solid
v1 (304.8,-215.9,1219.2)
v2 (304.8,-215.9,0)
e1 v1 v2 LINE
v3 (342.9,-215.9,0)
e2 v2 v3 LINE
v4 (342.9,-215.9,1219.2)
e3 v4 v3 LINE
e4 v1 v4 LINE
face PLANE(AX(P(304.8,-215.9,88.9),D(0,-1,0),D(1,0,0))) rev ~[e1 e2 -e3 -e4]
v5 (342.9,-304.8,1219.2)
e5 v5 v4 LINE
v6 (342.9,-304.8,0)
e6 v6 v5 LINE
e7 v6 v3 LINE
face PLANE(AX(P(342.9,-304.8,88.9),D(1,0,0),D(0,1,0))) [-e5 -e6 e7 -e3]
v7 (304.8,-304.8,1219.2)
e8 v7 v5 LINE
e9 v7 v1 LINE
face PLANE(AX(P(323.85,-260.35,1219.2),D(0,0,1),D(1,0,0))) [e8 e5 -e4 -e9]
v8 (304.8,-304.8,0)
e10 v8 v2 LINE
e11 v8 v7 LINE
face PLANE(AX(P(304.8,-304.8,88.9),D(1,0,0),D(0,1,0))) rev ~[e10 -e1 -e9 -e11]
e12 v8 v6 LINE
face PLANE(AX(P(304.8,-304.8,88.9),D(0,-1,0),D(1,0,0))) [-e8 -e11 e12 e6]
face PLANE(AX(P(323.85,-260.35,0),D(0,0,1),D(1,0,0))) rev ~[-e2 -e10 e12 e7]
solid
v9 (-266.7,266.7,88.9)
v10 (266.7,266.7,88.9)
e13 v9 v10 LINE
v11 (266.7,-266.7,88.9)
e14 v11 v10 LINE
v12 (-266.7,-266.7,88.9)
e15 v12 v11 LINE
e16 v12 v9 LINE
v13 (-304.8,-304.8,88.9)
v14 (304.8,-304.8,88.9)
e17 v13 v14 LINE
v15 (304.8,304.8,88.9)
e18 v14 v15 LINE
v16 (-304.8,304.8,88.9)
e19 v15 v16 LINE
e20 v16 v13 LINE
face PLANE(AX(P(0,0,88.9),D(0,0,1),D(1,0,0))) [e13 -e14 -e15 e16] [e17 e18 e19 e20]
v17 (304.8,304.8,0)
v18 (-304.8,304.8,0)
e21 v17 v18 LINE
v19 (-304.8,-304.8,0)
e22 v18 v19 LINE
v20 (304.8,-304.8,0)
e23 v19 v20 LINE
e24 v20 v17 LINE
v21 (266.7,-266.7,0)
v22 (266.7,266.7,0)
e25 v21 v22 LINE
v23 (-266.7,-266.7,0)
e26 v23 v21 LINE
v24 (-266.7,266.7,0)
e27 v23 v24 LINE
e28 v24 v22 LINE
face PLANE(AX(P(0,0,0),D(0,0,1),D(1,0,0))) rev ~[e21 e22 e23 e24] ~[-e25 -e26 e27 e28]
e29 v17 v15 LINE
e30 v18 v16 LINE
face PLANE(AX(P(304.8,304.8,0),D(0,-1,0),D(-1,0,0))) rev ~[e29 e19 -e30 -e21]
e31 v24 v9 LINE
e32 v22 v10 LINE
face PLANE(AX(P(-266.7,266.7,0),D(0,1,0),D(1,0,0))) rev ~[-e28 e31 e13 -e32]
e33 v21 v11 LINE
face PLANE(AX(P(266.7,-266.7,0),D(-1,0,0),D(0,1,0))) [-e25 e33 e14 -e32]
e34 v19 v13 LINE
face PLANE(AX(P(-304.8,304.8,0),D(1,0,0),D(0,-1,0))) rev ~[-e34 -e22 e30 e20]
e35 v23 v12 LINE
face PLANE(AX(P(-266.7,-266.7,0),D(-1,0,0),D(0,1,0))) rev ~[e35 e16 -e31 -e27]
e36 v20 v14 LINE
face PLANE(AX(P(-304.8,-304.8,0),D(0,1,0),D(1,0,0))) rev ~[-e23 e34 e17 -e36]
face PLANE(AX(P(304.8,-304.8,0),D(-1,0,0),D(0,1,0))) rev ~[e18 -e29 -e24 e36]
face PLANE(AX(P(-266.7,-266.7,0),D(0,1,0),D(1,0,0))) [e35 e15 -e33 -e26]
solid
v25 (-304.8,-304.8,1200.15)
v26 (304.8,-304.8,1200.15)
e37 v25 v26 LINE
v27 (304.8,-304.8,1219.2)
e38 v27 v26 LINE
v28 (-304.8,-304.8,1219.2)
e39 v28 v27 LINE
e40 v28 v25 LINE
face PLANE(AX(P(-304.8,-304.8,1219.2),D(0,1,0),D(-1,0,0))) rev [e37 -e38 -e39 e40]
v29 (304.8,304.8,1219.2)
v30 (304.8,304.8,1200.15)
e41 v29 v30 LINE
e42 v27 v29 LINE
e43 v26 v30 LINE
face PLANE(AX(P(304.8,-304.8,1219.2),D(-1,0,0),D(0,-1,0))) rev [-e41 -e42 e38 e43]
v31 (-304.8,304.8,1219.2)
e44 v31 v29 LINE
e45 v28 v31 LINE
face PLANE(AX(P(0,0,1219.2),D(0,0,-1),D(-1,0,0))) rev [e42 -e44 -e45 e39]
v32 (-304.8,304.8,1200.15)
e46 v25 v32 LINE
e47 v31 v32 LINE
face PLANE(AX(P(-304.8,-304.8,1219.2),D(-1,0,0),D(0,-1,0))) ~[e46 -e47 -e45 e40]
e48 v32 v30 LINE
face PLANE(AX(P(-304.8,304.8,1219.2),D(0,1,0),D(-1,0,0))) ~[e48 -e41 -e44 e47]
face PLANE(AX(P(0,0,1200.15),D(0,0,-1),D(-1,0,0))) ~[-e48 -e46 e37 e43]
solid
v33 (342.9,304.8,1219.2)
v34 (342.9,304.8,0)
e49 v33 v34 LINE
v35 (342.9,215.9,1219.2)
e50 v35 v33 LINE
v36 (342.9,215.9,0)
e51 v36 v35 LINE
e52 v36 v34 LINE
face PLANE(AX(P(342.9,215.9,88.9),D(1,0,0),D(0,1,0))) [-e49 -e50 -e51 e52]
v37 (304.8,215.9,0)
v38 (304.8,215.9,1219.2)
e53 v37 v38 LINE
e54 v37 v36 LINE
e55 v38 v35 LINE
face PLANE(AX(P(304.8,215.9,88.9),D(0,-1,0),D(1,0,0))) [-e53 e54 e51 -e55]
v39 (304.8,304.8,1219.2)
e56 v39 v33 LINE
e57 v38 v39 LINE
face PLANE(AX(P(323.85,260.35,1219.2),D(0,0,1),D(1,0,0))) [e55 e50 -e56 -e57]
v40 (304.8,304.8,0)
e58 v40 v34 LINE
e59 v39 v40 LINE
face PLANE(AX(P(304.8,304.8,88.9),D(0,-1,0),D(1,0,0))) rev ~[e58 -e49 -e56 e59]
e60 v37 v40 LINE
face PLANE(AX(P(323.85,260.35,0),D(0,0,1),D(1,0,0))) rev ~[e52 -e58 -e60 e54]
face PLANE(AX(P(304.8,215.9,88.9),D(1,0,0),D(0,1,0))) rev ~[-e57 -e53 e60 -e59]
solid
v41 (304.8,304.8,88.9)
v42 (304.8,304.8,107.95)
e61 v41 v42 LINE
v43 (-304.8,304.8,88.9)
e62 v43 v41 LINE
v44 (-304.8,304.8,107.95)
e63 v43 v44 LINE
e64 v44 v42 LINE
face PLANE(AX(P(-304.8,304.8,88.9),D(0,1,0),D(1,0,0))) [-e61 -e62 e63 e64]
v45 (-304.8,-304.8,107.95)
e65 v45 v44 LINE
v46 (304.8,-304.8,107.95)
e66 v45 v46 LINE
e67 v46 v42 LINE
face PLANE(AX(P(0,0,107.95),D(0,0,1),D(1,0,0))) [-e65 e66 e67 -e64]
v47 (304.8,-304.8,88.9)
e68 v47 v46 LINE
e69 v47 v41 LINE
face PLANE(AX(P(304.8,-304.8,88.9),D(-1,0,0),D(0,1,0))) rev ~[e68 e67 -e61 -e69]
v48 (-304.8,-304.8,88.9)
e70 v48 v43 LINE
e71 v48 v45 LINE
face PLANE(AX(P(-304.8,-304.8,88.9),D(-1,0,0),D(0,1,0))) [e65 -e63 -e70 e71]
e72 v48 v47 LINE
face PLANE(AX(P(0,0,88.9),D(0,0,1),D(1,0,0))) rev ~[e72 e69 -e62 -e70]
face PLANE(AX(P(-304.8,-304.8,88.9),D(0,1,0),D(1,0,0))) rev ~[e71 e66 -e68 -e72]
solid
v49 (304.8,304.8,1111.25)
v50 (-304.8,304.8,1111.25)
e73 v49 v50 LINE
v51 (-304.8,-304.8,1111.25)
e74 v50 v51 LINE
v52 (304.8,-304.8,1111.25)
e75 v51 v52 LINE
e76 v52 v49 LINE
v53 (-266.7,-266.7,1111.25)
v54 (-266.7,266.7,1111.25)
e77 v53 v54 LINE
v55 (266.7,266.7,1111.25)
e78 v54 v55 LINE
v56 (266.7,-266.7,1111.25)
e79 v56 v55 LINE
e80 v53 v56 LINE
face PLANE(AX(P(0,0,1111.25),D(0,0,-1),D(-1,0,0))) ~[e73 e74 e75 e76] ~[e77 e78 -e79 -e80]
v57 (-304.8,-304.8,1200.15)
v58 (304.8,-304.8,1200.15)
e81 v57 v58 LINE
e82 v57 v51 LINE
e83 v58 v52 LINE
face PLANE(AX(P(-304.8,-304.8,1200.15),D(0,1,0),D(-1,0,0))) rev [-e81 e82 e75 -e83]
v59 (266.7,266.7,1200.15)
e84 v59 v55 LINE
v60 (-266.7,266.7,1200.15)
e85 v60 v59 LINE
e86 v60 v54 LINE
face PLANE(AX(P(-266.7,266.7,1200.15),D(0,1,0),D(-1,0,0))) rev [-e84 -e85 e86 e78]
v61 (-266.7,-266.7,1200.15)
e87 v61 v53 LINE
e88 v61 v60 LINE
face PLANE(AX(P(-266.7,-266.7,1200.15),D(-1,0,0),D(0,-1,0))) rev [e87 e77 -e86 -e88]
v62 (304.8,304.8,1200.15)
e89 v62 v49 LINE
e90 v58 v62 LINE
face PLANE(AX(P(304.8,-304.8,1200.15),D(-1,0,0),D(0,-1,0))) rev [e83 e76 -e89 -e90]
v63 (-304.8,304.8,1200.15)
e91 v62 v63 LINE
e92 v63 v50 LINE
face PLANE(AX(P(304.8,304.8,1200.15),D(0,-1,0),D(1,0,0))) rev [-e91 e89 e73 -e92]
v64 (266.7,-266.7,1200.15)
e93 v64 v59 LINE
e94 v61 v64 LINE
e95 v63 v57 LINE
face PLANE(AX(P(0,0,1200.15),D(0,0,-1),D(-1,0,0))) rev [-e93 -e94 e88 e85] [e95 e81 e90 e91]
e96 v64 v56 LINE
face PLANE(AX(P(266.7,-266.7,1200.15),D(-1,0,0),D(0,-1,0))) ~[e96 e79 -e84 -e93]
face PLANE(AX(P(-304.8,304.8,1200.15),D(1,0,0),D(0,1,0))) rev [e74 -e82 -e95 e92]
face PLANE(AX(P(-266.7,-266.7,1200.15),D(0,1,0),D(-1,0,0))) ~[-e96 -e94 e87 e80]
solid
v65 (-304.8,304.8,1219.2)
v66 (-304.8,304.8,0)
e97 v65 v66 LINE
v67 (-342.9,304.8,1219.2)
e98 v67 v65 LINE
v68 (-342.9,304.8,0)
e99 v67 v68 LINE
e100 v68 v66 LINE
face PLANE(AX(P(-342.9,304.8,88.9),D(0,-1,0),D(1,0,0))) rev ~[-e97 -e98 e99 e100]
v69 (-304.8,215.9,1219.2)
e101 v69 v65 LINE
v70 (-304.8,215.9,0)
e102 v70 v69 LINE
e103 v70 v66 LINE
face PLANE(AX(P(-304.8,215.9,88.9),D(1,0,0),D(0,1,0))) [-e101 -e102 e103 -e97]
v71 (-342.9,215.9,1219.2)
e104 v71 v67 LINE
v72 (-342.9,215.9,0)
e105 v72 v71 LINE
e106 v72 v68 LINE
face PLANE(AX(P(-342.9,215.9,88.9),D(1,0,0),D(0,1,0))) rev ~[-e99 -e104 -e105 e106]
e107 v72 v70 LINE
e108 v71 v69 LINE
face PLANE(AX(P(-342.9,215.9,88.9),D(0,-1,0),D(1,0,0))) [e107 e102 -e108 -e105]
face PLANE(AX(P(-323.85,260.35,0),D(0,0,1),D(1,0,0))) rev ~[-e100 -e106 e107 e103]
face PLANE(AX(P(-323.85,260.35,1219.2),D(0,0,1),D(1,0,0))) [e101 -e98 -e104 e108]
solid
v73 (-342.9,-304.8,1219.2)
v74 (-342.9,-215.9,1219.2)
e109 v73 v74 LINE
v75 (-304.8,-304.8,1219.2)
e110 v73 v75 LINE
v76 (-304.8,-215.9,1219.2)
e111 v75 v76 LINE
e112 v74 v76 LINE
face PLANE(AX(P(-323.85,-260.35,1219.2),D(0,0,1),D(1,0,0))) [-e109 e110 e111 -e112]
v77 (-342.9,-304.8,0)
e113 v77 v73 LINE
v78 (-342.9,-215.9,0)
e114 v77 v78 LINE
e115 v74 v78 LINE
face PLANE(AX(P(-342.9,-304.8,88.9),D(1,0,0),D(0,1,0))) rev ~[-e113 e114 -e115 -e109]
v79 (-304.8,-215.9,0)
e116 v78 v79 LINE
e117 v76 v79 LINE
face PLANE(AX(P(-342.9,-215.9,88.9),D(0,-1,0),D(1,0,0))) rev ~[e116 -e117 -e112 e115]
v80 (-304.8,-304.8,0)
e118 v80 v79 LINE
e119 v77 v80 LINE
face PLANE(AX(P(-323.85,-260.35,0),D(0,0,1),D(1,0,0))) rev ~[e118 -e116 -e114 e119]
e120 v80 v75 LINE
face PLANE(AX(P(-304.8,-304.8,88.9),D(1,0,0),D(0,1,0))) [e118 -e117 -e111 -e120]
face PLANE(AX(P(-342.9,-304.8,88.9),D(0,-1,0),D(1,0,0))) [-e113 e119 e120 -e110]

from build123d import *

# Parameters (mm, degrees)
F0_W          = 533.4
F0_H          = 533.4
F1_DEPTH      = 88.9
F2_W          = 38.1
F2_H          = 88.9
F3_DEPTH      = 1130.3
F3_DEPTH_BACK = 88.9
F4_W          = 609.6
F4_H          = 609.6
F5_DEPTH      = 19.05


# Not quite as in the source:
# - a feature of the source that left no trace in its solid (it failed there, or was rolled back) is left out
# - a pattern or mirror of a feature is missing from the dataset's text; its kind, count and spacing are read off the source's solid


with BuildPart() as f1:
    # F0 (on Top) → F1 (new body)
    with BuildSketch(Plane.XY):
        Polygon((-279.4, 304.8), (-304.8, 304.8), (-304.8, 215.9), (-304.8, -215.9), (-304.8, -304.8), (-279.4, -304.8), (304.8, -304.8), (304.8, -266.7), (304.8, -215.9), (304.8, 215.9), (304.8, 304.8), (-266.7, 304.8), align=None)
        Rectangle(F0_W, F0_H, mode=Mode.SUBTRACT)
    extrude(amount=F1_DEPTH)


with BuildPart() as f1_copies_1:
    # F1_copies: instance of F1
    add(f1.part.mirror(Plane.XY.offset(600.075)))


with BuildPart() as f3:
    # F2 (on face) → F3 (new body, two sides)
    with BuildSketch(Plane.XY.offset(88.9)) as f3_sk:
        with Locations((-323.85, 260.35)):
            Rectangle(F2_W, F2_H)
    extrude(amount=F3_DEPTH)
    extrude(f3_sk.sketch, amount=-F3_DEPTH_BACK)


with BuildPart() as f3b:
    # F2 (on face) → F3, piece 2 (new body, two sides)
    with BuildSketch(Plane.XY.offset(88.9)) as f3_2_sk:
        with Locations((323.85, 260.35)):
            Rectangle(F2_W, F2_H)
    extrude(amount=F3_DEPTH)
    extrude(f3_2_sk.sketch, amount=-F3_DEPTH_BACK)


with BuildPart() as f3c:
    # F2 (on face) → F3, piece 3 (new body, two sides)
    with BuildSketch(Plane.XY.offset(88.9)) as f3_3_sk:
        with Locations((323.85, -260.35)):
            Rectangle(F2_W, F2_H)
    extrude(amount=F3_DEPTH)
    extrude(f3_3_sk.sketch, amount=-F3_DEPTH_BACK)


with BuildPart() as f3d:
    # F2 (on face) → F3, piece 4 (new body, two sides)
    with BuildSketch(Plane.XY.offset(88.9)) as f3_4_sk:
        with Locations((-323.85, -260.35)):
            Rectangle(F2_W, F2_H)
    extrude(amount=F3_DEPTH)
    extrude(f3_4_sk.sketch, amount=-F3_DEPTH_BACK)


with BuildPart() as f5:
    # F4 (on face) → F5 (new body)
    with BuildSketch(Plane.XY.offset(88.9)):
        Rectangle(F4_W, F4_H)
    extrude(amount=F5_DEPTH)


with BuildPart() as f5_copies_1:
    # F5_copies: instance of F5
    add(f5.part.mirror(Plane.XY.offset(654.05)))


solid = Compound([f1.part, f1_copies_1.part, f3.part, f3b.part, f3c.part, f3d.part, f5.part, f5_copies_1.part])
